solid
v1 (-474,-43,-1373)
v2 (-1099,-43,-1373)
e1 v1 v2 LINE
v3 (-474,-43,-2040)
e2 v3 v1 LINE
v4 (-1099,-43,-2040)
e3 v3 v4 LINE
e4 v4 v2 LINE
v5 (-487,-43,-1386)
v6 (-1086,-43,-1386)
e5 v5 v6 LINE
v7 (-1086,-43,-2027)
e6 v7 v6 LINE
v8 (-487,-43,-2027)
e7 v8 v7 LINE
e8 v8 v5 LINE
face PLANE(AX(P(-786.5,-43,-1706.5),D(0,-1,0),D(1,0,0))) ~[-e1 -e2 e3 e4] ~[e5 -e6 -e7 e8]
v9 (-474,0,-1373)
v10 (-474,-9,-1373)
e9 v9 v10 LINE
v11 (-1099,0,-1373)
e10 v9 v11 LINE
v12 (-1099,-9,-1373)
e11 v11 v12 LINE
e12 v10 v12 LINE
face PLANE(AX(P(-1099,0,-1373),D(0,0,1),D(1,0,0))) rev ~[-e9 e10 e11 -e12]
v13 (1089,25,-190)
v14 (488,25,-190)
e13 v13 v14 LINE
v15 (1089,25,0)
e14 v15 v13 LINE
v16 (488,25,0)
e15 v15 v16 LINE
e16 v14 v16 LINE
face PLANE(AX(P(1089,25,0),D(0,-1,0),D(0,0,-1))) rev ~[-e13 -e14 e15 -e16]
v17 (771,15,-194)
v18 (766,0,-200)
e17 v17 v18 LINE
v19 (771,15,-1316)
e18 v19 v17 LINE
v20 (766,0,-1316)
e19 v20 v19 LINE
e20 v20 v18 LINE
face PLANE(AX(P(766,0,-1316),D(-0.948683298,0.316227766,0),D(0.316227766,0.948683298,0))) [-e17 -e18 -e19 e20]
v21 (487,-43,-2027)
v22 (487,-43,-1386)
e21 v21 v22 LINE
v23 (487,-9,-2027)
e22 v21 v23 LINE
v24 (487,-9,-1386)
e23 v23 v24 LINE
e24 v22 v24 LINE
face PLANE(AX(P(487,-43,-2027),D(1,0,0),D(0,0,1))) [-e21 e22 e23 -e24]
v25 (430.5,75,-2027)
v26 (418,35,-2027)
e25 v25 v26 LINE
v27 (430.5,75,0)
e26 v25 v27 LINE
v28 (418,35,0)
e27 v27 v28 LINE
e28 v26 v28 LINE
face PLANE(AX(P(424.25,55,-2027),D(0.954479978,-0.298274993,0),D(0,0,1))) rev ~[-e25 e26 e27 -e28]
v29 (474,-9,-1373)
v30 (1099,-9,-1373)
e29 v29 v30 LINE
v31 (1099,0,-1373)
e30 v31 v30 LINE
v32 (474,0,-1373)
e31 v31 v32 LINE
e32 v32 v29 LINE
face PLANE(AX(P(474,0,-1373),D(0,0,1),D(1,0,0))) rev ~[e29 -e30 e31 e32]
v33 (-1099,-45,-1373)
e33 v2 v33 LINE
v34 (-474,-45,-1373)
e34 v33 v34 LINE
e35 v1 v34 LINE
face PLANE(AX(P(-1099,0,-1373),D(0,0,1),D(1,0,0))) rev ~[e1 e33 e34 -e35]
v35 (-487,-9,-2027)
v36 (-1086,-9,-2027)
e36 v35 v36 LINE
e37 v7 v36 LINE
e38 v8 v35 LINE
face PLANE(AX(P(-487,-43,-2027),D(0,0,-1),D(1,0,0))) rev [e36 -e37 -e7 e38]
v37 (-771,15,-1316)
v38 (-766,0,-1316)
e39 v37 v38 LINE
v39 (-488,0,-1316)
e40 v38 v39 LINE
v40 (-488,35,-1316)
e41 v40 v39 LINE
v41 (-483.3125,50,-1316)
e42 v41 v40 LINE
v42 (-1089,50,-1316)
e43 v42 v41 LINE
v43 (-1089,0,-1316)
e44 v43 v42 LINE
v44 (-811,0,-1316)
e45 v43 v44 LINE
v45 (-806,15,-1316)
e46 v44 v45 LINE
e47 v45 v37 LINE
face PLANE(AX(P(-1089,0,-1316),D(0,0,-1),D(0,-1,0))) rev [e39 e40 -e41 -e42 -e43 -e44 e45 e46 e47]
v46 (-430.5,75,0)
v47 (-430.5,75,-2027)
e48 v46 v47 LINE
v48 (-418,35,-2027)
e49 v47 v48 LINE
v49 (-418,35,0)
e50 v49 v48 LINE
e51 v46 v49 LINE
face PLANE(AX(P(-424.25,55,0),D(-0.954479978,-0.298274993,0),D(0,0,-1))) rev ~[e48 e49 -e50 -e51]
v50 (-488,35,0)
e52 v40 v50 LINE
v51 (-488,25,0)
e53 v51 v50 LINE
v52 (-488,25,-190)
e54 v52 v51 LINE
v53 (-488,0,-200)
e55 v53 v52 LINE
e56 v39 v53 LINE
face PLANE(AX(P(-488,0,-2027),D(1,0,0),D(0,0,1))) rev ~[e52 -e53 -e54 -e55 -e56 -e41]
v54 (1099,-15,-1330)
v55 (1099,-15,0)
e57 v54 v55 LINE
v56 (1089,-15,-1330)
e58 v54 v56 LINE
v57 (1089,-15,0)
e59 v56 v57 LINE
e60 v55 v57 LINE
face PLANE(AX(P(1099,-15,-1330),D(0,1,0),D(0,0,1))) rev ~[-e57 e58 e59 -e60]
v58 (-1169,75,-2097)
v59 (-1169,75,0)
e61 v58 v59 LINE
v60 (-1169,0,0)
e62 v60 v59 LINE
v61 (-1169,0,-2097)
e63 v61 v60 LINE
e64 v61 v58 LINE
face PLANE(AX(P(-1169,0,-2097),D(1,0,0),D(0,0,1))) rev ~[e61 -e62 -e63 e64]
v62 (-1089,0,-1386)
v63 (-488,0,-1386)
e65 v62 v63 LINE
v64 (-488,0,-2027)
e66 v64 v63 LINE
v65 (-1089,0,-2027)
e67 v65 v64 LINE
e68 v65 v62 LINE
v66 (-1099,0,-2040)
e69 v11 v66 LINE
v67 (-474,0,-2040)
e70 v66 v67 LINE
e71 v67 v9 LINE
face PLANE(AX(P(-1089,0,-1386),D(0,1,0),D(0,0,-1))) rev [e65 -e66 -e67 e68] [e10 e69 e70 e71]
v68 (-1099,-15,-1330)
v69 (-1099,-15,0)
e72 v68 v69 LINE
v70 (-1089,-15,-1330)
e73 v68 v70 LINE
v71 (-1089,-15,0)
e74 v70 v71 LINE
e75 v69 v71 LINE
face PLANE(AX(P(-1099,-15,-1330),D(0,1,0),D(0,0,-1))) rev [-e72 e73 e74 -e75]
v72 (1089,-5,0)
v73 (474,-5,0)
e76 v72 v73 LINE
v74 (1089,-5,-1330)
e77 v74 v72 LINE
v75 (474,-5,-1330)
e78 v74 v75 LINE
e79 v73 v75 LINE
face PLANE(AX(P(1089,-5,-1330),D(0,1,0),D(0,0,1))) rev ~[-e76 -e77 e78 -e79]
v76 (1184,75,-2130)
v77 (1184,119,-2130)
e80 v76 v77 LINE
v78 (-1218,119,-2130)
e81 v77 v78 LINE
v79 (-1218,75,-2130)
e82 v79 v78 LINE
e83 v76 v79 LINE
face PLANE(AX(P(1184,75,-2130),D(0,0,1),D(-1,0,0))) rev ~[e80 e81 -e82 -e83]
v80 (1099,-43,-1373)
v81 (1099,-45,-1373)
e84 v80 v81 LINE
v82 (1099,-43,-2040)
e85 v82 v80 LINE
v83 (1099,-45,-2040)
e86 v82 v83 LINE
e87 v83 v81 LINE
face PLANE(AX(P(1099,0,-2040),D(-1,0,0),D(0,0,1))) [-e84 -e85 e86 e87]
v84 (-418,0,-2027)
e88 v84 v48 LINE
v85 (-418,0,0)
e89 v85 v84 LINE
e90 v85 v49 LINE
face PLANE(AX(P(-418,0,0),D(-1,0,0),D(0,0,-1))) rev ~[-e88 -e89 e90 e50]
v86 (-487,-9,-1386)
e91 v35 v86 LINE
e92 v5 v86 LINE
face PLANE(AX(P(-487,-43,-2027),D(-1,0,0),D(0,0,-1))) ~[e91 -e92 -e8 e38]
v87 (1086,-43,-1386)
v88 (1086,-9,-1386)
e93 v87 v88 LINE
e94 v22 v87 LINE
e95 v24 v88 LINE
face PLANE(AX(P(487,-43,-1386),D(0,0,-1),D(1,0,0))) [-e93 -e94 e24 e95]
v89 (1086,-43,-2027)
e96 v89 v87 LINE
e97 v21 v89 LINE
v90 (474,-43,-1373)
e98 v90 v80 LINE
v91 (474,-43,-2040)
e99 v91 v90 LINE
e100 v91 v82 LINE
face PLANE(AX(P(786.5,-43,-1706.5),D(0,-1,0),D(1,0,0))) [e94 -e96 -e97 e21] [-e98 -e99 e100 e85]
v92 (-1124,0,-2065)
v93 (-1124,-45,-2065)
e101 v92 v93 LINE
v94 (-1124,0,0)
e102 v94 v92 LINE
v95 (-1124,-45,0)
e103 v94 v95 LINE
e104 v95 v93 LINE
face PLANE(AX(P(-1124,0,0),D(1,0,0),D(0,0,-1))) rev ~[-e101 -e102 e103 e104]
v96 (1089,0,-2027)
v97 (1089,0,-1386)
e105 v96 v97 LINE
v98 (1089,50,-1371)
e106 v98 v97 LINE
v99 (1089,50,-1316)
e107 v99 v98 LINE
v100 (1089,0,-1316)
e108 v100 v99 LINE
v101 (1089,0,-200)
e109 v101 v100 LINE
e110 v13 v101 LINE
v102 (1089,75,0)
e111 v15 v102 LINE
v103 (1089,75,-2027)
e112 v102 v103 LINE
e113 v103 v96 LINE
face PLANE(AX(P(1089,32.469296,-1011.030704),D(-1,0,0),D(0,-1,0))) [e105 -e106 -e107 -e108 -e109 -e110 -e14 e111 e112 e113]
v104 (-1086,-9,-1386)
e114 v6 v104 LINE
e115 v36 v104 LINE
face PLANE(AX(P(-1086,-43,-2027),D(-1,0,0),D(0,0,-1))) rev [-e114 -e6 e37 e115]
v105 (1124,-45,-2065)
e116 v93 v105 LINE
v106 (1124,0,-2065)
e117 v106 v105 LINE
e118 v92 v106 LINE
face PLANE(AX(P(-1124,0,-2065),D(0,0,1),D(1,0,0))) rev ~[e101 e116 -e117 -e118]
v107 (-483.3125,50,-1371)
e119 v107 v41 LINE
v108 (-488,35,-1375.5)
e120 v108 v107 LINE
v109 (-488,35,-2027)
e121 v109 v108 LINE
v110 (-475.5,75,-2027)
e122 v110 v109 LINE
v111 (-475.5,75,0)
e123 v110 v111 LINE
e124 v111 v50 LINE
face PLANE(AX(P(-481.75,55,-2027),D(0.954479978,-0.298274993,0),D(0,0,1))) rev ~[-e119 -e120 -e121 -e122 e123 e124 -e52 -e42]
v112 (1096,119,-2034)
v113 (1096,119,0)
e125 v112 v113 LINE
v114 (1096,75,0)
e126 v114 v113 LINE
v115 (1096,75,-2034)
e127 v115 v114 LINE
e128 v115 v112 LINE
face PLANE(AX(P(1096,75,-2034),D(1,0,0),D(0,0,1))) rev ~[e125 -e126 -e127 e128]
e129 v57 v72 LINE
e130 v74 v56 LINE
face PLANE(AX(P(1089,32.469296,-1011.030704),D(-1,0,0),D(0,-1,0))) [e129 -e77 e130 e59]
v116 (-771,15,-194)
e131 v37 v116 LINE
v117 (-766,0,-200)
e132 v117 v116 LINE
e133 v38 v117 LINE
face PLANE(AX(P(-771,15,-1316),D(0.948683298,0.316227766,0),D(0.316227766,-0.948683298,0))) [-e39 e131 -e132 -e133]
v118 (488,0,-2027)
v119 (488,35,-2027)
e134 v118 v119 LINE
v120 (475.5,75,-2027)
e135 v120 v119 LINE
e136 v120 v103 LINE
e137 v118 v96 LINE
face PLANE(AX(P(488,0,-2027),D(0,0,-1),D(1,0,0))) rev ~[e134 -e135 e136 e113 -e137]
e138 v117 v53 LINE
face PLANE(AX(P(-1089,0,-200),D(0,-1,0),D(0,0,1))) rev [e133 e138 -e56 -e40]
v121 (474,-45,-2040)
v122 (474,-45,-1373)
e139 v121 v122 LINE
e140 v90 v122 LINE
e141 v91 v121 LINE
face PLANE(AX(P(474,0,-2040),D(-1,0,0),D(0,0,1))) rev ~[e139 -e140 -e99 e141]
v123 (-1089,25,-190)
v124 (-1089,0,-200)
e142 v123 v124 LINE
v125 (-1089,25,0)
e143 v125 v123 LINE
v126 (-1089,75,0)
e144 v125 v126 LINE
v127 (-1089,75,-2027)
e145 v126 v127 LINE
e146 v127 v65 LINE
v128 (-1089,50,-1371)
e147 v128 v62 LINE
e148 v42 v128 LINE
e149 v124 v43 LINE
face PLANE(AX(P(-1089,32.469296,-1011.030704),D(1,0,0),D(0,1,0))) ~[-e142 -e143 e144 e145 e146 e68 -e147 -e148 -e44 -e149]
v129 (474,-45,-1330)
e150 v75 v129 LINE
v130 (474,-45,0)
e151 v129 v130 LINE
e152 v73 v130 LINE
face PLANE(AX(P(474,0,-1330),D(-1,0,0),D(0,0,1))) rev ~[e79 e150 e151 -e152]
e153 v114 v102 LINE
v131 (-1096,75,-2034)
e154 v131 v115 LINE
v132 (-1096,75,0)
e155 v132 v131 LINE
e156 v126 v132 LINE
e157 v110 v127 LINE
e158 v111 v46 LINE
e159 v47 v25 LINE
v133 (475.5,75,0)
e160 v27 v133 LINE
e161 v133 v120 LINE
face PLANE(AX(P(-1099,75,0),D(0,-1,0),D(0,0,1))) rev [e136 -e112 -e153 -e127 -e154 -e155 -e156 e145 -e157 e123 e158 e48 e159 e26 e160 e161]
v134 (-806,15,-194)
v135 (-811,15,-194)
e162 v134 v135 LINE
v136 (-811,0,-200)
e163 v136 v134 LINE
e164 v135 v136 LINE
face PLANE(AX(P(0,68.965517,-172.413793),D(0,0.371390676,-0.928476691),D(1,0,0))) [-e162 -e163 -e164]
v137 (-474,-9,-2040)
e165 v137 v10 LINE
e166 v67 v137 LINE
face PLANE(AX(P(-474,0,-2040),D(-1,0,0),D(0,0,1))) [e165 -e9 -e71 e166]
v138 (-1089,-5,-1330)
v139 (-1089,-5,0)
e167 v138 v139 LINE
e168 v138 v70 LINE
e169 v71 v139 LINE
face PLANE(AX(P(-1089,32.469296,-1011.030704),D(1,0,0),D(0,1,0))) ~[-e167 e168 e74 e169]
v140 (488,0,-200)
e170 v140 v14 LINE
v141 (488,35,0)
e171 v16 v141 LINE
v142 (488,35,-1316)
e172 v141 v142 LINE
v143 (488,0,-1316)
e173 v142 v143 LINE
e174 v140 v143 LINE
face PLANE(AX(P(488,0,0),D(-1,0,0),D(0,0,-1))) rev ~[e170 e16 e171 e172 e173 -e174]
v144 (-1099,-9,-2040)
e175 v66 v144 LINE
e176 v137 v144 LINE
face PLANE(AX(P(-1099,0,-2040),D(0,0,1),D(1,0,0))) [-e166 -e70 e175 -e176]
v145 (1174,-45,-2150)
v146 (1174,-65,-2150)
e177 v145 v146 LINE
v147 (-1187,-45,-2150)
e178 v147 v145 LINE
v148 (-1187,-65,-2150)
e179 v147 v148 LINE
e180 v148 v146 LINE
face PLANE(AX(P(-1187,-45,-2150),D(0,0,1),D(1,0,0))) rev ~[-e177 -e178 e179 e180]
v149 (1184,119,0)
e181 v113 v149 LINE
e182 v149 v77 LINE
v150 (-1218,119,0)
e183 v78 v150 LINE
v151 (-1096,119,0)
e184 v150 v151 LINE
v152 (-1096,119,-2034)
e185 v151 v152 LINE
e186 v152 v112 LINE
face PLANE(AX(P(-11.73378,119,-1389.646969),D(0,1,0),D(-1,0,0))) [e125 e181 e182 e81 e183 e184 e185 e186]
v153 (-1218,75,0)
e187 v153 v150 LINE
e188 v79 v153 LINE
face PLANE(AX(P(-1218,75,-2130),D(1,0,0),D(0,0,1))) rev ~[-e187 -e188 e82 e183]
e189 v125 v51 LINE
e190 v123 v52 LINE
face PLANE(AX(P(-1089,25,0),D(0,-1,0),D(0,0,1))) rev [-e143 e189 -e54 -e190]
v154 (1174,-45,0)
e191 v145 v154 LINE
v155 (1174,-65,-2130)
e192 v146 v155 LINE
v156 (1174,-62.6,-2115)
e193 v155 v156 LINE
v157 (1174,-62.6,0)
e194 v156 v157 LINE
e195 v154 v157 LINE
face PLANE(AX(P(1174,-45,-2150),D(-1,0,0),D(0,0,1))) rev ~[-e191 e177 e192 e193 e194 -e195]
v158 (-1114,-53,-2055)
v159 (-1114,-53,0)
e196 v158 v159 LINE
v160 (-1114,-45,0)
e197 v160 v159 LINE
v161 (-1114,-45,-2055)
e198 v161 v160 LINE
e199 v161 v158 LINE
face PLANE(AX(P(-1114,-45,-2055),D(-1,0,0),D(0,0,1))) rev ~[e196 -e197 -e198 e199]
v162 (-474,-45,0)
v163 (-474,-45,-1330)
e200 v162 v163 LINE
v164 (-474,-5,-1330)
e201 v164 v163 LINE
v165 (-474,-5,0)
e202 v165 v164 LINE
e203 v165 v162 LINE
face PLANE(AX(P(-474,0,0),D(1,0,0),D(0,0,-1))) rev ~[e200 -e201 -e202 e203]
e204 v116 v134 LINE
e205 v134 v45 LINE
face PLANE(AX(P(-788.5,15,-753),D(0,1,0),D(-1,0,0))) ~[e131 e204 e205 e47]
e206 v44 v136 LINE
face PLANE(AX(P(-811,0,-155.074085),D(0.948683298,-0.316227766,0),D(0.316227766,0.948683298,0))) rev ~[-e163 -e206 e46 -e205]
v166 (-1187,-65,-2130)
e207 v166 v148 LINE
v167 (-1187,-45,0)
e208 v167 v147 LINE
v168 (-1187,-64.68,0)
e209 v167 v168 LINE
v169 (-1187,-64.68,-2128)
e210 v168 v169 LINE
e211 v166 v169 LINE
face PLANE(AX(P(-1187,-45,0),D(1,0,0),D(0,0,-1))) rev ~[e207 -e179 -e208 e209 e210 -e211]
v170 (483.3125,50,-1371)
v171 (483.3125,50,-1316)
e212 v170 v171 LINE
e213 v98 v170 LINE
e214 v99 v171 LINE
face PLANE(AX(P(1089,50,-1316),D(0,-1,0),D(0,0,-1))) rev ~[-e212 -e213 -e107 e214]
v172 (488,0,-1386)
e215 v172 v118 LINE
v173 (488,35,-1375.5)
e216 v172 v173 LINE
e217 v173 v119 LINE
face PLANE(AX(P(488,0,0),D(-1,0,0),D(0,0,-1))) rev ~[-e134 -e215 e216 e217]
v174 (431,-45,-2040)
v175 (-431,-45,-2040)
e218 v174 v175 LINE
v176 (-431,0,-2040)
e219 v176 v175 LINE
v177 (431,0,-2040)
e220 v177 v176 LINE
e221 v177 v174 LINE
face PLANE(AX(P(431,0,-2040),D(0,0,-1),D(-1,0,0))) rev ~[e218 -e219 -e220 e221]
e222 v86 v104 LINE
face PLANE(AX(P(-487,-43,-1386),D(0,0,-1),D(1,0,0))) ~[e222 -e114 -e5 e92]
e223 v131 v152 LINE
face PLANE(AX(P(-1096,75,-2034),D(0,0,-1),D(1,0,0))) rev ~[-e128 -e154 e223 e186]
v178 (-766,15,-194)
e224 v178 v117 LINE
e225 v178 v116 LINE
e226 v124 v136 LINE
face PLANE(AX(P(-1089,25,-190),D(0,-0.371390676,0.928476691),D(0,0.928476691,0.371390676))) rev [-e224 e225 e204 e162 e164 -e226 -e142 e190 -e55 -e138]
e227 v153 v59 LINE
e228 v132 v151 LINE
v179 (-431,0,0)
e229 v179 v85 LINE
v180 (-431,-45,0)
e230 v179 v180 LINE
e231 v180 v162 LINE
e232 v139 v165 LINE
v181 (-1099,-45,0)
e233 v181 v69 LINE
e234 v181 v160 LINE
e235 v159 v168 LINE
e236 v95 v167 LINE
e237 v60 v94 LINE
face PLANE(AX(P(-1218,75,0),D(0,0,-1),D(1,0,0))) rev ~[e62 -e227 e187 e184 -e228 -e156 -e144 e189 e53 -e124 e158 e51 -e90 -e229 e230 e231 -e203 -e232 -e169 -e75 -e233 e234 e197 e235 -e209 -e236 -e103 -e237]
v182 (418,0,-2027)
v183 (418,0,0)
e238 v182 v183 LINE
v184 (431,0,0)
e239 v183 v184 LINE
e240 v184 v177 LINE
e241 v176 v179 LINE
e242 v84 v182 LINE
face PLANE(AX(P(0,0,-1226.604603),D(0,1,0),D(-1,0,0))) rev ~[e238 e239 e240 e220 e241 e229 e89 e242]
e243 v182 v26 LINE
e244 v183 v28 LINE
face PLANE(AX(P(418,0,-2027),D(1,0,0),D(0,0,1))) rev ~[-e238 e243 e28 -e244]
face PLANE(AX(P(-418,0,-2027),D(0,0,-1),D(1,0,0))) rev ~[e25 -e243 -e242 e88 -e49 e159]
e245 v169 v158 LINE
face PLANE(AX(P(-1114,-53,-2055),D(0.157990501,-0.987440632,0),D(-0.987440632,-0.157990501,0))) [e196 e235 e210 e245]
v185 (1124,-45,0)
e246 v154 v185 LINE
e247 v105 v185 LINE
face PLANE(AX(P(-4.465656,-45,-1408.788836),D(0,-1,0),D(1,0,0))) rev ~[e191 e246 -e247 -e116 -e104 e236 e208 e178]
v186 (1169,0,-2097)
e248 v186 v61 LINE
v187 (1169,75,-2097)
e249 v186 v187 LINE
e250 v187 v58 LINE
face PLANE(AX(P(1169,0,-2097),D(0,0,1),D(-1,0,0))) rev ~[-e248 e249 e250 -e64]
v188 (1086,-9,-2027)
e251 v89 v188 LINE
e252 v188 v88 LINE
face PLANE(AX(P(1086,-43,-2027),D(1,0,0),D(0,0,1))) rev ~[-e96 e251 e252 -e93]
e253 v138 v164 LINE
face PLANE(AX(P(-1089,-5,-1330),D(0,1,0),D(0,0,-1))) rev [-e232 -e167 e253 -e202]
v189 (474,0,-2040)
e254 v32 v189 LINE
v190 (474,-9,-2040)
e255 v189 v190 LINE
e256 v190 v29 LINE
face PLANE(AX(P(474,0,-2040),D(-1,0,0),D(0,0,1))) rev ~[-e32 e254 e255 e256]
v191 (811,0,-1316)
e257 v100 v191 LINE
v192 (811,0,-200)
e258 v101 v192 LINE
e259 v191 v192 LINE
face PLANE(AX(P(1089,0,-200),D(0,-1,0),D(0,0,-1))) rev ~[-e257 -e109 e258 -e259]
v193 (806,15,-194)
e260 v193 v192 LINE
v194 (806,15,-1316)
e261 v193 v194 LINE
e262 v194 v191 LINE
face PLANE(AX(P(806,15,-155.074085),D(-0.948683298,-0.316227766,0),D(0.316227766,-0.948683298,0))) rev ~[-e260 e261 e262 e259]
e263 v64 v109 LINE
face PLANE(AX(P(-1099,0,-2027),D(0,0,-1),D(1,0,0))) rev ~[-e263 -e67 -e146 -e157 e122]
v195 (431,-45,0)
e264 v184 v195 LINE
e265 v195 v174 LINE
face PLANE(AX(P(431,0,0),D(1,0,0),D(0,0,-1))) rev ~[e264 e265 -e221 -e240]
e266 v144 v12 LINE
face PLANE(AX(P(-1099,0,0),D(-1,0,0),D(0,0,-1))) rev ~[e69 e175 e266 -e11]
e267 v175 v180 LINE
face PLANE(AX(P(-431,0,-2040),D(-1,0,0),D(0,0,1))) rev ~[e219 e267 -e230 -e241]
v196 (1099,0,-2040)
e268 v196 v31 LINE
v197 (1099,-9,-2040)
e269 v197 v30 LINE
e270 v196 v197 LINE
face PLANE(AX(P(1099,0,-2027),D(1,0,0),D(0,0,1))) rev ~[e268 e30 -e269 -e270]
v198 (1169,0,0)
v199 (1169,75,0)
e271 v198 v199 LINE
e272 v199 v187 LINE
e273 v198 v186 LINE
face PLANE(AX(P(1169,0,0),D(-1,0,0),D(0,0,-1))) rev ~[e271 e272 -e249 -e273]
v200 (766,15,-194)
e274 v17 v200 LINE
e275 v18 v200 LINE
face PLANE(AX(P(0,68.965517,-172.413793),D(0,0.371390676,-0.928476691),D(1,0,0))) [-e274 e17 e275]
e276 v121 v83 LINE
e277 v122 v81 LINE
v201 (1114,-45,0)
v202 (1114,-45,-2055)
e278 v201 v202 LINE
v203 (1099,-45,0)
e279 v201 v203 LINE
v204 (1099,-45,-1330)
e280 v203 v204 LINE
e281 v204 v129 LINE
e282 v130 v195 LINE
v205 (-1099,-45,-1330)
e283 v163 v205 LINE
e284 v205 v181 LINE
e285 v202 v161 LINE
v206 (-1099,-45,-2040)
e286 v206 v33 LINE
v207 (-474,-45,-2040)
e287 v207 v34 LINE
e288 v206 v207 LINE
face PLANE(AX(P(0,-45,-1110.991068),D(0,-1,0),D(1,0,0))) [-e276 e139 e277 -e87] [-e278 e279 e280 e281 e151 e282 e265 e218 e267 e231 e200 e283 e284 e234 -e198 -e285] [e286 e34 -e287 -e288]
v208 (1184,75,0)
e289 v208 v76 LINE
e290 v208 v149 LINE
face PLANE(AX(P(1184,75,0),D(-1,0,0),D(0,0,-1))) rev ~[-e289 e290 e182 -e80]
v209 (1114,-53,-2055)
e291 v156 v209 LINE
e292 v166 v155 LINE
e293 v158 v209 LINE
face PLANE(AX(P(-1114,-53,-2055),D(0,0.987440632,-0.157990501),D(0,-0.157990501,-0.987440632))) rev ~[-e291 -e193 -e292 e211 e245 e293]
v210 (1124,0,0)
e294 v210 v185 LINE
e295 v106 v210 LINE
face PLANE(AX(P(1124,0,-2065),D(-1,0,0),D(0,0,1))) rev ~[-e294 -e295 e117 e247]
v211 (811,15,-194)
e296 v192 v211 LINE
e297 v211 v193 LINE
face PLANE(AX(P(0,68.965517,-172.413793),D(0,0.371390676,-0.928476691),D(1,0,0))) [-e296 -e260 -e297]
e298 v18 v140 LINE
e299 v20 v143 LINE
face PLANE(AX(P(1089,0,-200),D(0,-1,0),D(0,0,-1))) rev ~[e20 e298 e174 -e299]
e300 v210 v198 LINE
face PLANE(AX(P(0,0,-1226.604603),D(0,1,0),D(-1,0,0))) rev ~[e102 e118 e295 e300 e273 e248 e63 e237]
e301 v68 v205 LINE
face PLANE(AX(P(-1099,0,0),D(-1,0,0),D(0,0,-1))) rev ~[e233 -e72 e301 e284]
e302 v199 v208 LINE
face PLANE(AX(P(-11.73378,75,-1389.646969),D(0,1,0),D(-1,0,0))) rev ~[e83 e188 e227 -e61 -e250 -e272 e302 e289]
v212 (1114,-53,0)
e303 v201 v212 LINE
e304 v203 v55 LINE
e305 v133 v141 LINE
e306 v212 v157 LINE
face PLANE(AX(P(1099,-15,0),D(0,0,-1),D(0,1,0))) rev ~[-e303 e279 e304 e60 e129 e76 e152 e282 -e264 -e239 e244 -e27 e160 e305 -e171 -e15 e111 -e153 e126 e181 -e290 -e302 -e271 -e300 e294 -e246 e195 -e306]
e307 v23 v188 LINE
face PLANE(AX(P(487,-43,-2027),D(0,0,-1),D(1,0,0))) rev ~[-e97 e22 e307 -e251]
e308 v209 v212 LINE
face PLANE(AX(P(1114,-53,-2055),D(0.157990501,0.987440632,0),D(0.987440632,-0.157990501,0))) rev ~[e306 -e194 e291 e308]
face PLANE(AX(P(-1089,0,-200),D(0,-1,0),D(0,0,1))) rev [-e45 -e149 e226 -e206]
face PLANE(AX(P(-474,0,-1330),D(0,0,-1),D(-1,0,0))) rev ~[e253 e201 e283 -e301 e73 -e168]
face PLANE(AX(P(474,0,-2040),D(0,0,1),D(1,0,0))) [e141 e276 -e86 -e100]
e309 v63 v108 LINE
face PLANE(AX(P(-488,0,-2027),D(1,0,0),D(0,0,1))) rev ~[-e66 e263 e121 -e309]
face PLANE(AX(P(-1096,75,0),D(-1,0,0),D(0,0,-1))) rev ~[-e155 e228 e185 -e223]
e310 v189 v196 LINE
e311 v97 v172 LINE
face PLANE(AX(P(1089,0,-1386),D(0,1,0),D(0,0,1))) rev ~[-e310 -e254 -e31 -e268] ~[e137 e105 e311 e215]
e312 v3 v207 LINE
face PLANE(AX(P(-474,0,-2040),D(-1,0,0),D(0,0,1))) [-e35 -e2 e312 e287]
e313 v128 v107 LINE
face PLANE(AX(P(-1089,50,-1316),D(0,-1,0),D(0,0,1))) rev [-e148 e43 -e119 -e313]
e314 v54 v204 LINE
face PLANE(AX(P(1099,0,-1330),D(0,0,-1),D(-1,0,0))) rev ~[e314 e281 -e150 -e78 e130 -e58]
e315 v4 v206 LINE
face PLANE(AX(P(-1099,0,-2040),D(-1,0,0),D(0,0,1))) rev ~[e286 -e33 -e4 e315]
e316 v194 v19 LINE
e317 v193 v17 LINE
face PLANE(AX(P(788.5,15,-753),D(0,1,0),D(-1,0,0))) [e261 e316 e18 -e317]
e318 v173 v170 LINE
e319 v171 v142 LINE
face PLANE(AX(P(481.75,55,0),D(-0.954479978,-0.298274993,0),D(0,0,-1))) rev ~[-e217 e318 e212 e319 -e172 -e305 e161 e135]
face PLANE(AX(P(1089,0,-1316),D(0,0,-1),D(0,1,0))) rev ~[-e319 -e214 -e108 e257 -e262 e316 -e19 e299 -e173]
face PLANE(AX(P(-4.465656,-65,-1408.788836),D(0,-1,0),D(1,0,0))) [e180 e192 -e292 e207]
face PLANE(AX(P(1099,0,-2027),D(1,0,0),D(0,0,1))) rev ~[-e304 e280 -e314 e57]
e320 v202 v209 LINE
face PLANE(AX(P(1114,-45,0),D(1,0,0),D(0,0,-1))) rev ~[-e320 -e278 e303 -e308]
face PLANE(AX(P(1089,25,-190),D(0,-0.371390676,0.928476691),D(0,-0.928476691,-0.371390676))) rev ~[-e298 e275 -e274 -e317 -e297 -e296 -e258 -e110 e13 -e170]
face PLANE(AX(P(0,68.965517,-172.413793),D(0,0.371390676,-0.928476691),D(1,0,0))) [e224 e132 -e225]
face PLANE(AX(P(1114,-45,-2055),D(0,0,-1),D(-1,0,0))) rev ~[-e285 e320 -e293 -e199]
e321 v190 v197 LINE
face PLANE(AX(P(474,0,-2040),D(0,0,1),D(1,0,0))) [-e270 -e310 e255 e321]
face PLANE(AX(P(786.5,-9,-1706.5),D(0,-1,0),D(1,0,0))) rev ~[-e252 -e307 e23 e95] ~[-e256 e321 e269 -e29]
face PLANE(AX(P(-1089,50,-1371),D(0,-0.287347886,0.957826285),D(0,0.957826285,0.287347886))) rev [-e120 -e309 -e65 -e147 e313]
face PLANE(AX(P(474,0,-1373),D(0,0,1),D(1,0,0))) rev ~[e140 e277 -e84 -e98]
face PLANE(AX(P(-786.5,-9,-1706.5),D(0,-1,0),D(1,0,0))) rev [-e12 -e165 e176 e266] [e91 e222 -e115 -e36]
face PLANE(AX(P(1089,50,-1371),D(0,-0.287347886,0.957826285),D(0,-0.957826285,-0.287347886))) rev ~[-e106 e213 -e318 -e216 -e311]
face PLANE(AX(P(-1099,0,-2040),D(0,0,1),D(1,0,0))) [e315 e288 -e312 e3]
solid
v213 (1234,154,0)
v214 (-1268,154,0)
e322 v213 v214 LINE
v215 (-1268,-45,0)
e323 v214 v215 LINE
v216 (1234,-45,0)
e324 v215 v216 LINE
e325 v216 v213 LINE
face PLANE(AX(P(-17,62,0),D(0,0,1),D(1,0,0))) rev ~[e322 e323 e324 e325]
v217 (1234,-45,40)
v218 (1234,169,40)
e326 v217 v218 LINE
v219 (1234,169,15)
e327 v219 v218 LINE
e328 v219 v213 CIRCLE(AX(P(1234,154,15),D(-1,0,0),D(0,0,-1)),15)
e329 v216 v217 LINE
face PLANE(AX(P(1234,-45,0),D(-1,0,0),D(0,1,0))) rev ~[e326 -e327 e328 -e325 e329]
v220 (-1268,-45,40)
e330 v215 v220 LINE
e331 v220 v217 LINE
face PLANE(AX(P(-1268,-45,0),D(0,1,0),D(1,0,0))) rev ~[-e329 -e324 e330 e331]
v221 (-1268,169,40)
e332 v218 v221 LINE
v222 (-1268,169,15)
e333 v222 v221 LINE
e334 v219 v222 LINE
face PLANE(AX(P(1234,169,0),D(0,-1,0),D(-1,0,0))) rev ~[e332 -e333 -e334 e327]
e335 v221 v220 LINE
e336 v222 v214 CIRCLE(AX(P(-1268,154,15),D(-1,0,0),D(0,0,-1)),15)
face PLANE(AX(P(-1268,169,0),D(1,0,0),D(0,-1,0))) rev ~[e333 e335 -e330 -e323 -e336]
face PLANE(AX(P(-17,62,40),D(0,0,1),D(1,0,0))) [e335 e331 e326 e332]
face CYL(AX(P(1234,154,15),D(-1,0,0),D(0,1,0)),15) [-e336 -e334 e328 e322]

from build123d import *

# Parameters (mm, degrees)
F0_W          = 625
F0_H          = 667
F1_DEPTH      = 45
F3_W          = 645
F3_H          = 687
F3_W_2        = 599
F3_H_2        = 641
F4_DEPTH      = 34
F7_DEPTH      = 75
F9_DEPTH      = 20
F10_T1_DEPTH  = 2228
F10_T3_DEPTH  = 2249.90940659
F10_T9_DEPTH  = 2249.90940659
F10_T15_DEPTH = 2422.90940659
F10_T23_DEPTH = 2422.90940659
F10_T28_DEPTH = 2249.90940659
F11_SIZE2     = 40
F11_SIZE      = 12.5
F13_DEPTH     = 10
F15_DEPTH     = 620
F16_W         = 45
F16_H         = 1126
F17_DEPTH     = 15
F18_T4_DEPTH  = 1160.9259151598
F18_T10_DEPTH = 1160.9259151598
F18_T16_DEPTH = 1160.9259151598
F18_T22_DEPTH = 1160.9259151598
F20_DEPTH     = 44
F22_DEPTH     = 40
F23_R         = 15


# Not quite as in the source:
# - a fillet or chamfer that OpenCascade refuses, or shapes differently, is made with other operations: its cross-section is extruded or revolved along the edge and cut away or added
# - a pattern or mirror of a feature is missing from the dataset's text; its kind, count and spacing are read off the source's solid


with BuildPart() as f1:
    # F0 (on Front) → F1 (new body)
    with BuildSketch(Plane.XZ):
        Polygon((474, 0), (431, 0), (431, -2040), (-431, -2040), (-431, 0), (-474, 0), (-474, -1330), (-1099, -1330), (-1099, 0), (-1124, 0), (-1124, -2065), (1124, -2065), (1124, 0), (1099, 0), (1099, -1330), (474, -1330), align=None)
        with Locations((-786.5, -1706.5)):
            Rectangle(F0_W, F0_H, mode=Mode.SUBTRACT)
        with Locations((786.5, -1706.5)):
            Rectangle(F0_W, F0_H, mode=Mode.SUBTRACT)
    extrude(amount=F1_DEPTH)

    # F3 (on offset) → F4 (join)
    with BuildSketch(Plane.XZ.offset(43)):
        with Locations((786.5, -1706.5)):
            Rectangle(F3_W, F3_H)
        with Locations((786.5, -1706.5)):
            Rectangle(F3_W_2, F3_H_2, mode=Mode.SUBTRACT)
    extrude(amount=-F4_DEPTH)

    # F6: F1 across plane


with BuildPart() as f1_1:
    add(f1.part)
    add(f1.part.mirror(Plane.YZ))

    # F5 (on face) → F7 (join)
    with BuildSketch(Plane(origin=(0, 0, 0), x_dir=(-1, 0, 0), z_dir=(0, 1, 0))):
        Polygon((-488, -2027), (-1099, -2027), (-1099, 0), (-1169, 0), (-1169, -2097), (1169, -2097), (1169, 0), (1099, 0), (1099, -2027), (488, -2027), (488, 0), (418, 0), (418, -2027), (-418, -2027), (-418, 0), (-488, 0), align=None)
    extrude(amount=F7_DEPTH)

    # F8 (on face) → F9 (join)
    with BuildSketch(Plane.XZ.offset(45)):
        Polygon((1114, 0), (1114, -2055), (-1114, -2055), (-1114, 0), (-1187, 0), (-1187, -2150), (1174, -2150), (1174, 0), align=None)
    extrude(amount=F9_DEPTH)

    # F10: chamfer of 12 x 75 on 3 edges, made by hand

    # F10_s2 → F10_t1 (cut)
    with BuildSketch(Plane.YZ.offset(-1114)):
        Polygon((-53, -2055), (-65, -2130), (-65, -2055), align=None)
    extrude(amount=F10_T1_DEPTH, mode=Mode.SUBTRACT)

    # F10_s4 → F10_t3 (cut)
    with BuildSketch(Plane.XY.offset(-2055)):
        Polygon((-1114, -53), (-1189, -65), (-1114, -65), align=None)
        Polygon((1114, -53), (1189, -65), (1114, -65), align=None)
    extrude(amount=F10_T3_DEPTH, mode=Mode.SUBTRACT)


with BuildPart() as f10_tool7:
    # F10_s8 → F10_t9 (new body)
    with BuildSketch(Plane.XY):
        Polygon((1114, -53), (1189, -65), (1114, -65), align=None)
    extrude(amount=-F10_T9_DEPTH)

    split(bisect_by=Plane.XY.offset(-2055), keep=Keep.BOTTOM)

    split(bisect_by=Plane.YZ.offset(1174), keep=Keep.BOTTOM)

    split(bisect_by=Plane.XY.offset(-2150), keep=Keep.TOP)


with BuildPart() as f10_tool13:
    # F10_s14 → F10_t15 (new body)
    with BuildSketch(Plane.YZ.offset(1308.90940659)):
        Polygon((-53, -2055), (-65, -2130), (-65, -2055), align=None)
    extrude(amount=-F10_T15_DEPTH)

    split(bisect_by=Plane.YZ.offset(1114), keep=Keep.TOP)

    split(bisect_by=Plane.YZ.offset(1174), keep=Keep.BOTTOM)


with BuildPart() as f10_tool7_1:
    add(f10_tool7.part)

    # F10_t18: intersect F10_tool13
    add(f10_tool13.part, mode=Mode.INTERSECT)


with BuildPart() as f1_2:
    add(f1_1.part)

    # F10_t5: cut F10_tool7
    add(f10_tool7_1.part, mode=Mode.SUBTRACT)


with BuildPart() as f10_tool21:
    # F10_s22 → F10_t23 (new body)
    with BuildSketch(Plane.YZ.offset(1114)):
        Polygon((-53, -2055), (-65, -2130), (-65, -2055), align=None)
    extrude(amount=-F10_T23_DEPTH)

    split(bisect_by=Plane.YZ.offset(-1114), keep=Keep.BOTTOM)

    split(bisect_by=Plane.YZ.offset(-1187), keep=Keep.TOP)


with BuildPart() as f10_tool26:
    # F10_s27 → F10_t28 (new body)
    with BuildSketch(Plane.XY.offset(-2249.90940659)):
        Polygon((-1114, -53), (-1189, -65), (-1114, -65), align=None)
    extrude(amount=F10_T28_DEPTH)

    split(bisect_by=Plane.XY.offset(-2055), keep=Keep.BOTTOM)

    split(bisect_by=Plane.YZ.offset(-1187), keep=Keep.TOP)

    split(bisect_by=Plane.XY.offset(-2150), keep=Keep.TOP)


with BuildPart() as f10_tool21_1:
    add(f10_tool21.part)

    # F10_t32: intersect F10_tool26
    add(f10_tool26.part, mode=Mode.INTERSECT)


with BuildPart() as f1_3:
    add(f1_2.part)

    # F10_t19: cut F10_tool21
    add(f10_tool21_1.part, mode=Mode.SUBTRACT)

    # F11
    f11_edges = [f1_3.edges().sort_by_distance(p)[0] for p in [
        (-488, 75, -1013.5),
        (-418, 75, -1013.5),
        (488, 75, -1013.5),
        (418, 75, -1013.5),
    ]]
    f11_side = f1_3.faces().sort_by_distance((793.5, 75, -2058.406453))[0]
    chamfer(f11_edges, length=F11_SIZE, length2=F11_SIZE2, reference=f11_side)

    # F12 (on face) → F13 (join)
    with BuildSketch(Plane(origin=(1099, 0, 0), x_dir=(0, -1, 0), z_dir=(-1, 0, 0))):
        Polygon((0, -2027), (0, -1373), (0, -1330), (15, -1330), (15, 0), (-75, 0), (-75, -2027), align=None)
    f13 = extrude(amount=F13_DEPTH)

    # F13_copies: F13 across plane
    add(f13.mirror(Plane(origin=(0, 0, 0), x_dir=(0, 0, -1), z_dir=(-1, 0, 0))))

    # F14 (on face) → F15 (join)
    with BuildSketch(Plane(origin=(1089, 0, 0), x_dir=(0, -1, 0), z_dir=(-1, 0, 0))):
        Polygon((0, -1386), (0, -1373), (0, -1330), (5, -1330), (5, 0), (-25, 0), (-25, -190), (0, -200), (0, -1316), (-50, -1316), (-50, -1371), align=None)
    f15 = extrude(amount=F15_DEPTH)

    # F15_copies: F15 across plane
    add(f15.mirror(Plane(origin=(0, 0, 0), x_dir=(0, 0, -1), z_dir=(-1, 0, 0))))

    # F16 (on face) → F17 (join)
    with BuildSketch(Plane(origin=(0, 0, 0), x_dir=(-1, 0, 0), z_dir=(0, 1, 0))):
        with Locations((-788.5, -753)):
            Rectangle(F16_W, F16_H)
    f17 = extrude(amount=F17_DEPTH)

    # F17_copies: F17 across plane
    add(f17.mirror(Plane(origin=(0, 0, 0), x_dir=(0, 0, -1), z_dir=(-1, 0, 0))))

    # F18: chamfer of 5 x 15 on 4 edges, made by hand


with BuildPart() as f18_tool2:
    # F18_s3 → F18_t4 (new body)
    with BuildSketch(Plane.XY.offset(-1316)):
        Polygon((766, 0), (771, 15), (766, 15), align=None)
    extrude(amount=F18_T4_DEPTH)

    split(bisect_by=Plane(origin=(0, 68.9655172414, -172.4137931034), x_dir=(1, 0, 0), z_dir=(0, 0.3713906764, -0.9284766909)), keep=Keep.TOP)

    split(bisect_by=Plane.XZ, keep=Keep.BOTTOM)


with BuildPart() as f1_4:
    add(f1_3.part)

    # F18_t1: cut F18_tool2
    add(f18_tool2.part, mode=Mode.SUBTRACT)


with BuildPart() as f18_tool8:
    # F18_s9 → F18_t10 (new body)
    with BuildSketch(Plane.XY.offset(-155.0740848402)):
        Polygon((806, 15), (811, 0), (811, 15), align=None)
    extrude(amount=-F18_T10_DEPTH)

    split(bisect_by=Plane(origin=(0, 68.9655172414, -172.4137931034), x_dir=(1, 0, 0), z_dir=(0, 0.3713906764, -0.9284766909)), keep=Keep.TOP)

    split(bisect_by=Plane.XZ, keep=Keep.BOTTOM)


with BuildPart() as f1_5:
    add(f1_4.part)

    # F18_t7: cut F18_tool8
    add(f18_tool8.part, mode=Mode.SUBTRACT)


with BuildPart() as f18_tool14:
    # F18_s15 → F18_t16 (new body)
    with BuildSketch(Plane.XY.offset(-155.0740848402)):
        Polygon((-811, 0), (-806, 15), (-811, 15), align=None)
    extrude(amount=-F18_T16_DEPTH)

    split(bisect_by=Plane(origin=(0, 68.9655172414, -172.4137931034), x_dir=(1, 0, 0), z_dir=(0, 0.3713906764, -0.9284766909)), keep=Keep.TOP)

    split(bisect_by=Plane.XZ, keep=Keep.BOTTOM)


with BuildPart() as f1_6:
    add(f1_5.part)

    # F18_t13: cut F18_tool14
    add(f18_tool14.part, mode=Mode.SUBTRACT)


with BuildPart() as f18_tool20:
    # F18_s21 → F18_t22 (new body)
    with BuildSketch(Plane.XY.offset(-1316)):
        Polygon((-771, 15), (-766, 0), (-766, 15), align=None)
    extrude(amount=F18_T22_DEPTH)

    split(bisect_by=Plane(origin=(0, 68.9655172414, -172.4137931034), x_dir=(1, 0, 0), z_dir=(0, 0.3713906764, -0.9284766909)), keep=Keep.TOP)

    split(bisect_by=Plane.XZ, keep=Keep.BOTTOM)


with BuildPart() as f1_7:
    add(f1_6.part)

    # F18_t19: cut F18_tool20
    add(f18_tool20.part, mode=Mode.SUBTRACT)

    # F19 (on face) → F20 (join)
    with BuildSketch(Plane(origin=(0, 75, 0), x_dir=(-1, 0, 0), z_dir=(0, 1, 0))):
        Polygon((1096, 0), (1096, -2034), (-1096, -2034), (-1096, 0), (-1184, 0), (-1184, -2130), (1218, -2130), (1218, 0), align=None)
    extrude(amount=F20_DEPTH)


with BuildPart() as f22:
    # F21 (on face) → F22 (new body)
    with BuildSketch(Plane.XY):
        Polygon((-1268, -45), (1124, -45), (1234, -45), (1234, 169), (-1268, 169), align=None)
    extrude(amount=F22_DEPTH)

    # F23
    f23_edges = [f22.edges().sort_by_distance(p)[0] for p in [
        (-17, 169, 0),
    ]]
    fillet(f23_edges, radius=F23_R)


solid = Compound([f1_7.part, f22.part])
